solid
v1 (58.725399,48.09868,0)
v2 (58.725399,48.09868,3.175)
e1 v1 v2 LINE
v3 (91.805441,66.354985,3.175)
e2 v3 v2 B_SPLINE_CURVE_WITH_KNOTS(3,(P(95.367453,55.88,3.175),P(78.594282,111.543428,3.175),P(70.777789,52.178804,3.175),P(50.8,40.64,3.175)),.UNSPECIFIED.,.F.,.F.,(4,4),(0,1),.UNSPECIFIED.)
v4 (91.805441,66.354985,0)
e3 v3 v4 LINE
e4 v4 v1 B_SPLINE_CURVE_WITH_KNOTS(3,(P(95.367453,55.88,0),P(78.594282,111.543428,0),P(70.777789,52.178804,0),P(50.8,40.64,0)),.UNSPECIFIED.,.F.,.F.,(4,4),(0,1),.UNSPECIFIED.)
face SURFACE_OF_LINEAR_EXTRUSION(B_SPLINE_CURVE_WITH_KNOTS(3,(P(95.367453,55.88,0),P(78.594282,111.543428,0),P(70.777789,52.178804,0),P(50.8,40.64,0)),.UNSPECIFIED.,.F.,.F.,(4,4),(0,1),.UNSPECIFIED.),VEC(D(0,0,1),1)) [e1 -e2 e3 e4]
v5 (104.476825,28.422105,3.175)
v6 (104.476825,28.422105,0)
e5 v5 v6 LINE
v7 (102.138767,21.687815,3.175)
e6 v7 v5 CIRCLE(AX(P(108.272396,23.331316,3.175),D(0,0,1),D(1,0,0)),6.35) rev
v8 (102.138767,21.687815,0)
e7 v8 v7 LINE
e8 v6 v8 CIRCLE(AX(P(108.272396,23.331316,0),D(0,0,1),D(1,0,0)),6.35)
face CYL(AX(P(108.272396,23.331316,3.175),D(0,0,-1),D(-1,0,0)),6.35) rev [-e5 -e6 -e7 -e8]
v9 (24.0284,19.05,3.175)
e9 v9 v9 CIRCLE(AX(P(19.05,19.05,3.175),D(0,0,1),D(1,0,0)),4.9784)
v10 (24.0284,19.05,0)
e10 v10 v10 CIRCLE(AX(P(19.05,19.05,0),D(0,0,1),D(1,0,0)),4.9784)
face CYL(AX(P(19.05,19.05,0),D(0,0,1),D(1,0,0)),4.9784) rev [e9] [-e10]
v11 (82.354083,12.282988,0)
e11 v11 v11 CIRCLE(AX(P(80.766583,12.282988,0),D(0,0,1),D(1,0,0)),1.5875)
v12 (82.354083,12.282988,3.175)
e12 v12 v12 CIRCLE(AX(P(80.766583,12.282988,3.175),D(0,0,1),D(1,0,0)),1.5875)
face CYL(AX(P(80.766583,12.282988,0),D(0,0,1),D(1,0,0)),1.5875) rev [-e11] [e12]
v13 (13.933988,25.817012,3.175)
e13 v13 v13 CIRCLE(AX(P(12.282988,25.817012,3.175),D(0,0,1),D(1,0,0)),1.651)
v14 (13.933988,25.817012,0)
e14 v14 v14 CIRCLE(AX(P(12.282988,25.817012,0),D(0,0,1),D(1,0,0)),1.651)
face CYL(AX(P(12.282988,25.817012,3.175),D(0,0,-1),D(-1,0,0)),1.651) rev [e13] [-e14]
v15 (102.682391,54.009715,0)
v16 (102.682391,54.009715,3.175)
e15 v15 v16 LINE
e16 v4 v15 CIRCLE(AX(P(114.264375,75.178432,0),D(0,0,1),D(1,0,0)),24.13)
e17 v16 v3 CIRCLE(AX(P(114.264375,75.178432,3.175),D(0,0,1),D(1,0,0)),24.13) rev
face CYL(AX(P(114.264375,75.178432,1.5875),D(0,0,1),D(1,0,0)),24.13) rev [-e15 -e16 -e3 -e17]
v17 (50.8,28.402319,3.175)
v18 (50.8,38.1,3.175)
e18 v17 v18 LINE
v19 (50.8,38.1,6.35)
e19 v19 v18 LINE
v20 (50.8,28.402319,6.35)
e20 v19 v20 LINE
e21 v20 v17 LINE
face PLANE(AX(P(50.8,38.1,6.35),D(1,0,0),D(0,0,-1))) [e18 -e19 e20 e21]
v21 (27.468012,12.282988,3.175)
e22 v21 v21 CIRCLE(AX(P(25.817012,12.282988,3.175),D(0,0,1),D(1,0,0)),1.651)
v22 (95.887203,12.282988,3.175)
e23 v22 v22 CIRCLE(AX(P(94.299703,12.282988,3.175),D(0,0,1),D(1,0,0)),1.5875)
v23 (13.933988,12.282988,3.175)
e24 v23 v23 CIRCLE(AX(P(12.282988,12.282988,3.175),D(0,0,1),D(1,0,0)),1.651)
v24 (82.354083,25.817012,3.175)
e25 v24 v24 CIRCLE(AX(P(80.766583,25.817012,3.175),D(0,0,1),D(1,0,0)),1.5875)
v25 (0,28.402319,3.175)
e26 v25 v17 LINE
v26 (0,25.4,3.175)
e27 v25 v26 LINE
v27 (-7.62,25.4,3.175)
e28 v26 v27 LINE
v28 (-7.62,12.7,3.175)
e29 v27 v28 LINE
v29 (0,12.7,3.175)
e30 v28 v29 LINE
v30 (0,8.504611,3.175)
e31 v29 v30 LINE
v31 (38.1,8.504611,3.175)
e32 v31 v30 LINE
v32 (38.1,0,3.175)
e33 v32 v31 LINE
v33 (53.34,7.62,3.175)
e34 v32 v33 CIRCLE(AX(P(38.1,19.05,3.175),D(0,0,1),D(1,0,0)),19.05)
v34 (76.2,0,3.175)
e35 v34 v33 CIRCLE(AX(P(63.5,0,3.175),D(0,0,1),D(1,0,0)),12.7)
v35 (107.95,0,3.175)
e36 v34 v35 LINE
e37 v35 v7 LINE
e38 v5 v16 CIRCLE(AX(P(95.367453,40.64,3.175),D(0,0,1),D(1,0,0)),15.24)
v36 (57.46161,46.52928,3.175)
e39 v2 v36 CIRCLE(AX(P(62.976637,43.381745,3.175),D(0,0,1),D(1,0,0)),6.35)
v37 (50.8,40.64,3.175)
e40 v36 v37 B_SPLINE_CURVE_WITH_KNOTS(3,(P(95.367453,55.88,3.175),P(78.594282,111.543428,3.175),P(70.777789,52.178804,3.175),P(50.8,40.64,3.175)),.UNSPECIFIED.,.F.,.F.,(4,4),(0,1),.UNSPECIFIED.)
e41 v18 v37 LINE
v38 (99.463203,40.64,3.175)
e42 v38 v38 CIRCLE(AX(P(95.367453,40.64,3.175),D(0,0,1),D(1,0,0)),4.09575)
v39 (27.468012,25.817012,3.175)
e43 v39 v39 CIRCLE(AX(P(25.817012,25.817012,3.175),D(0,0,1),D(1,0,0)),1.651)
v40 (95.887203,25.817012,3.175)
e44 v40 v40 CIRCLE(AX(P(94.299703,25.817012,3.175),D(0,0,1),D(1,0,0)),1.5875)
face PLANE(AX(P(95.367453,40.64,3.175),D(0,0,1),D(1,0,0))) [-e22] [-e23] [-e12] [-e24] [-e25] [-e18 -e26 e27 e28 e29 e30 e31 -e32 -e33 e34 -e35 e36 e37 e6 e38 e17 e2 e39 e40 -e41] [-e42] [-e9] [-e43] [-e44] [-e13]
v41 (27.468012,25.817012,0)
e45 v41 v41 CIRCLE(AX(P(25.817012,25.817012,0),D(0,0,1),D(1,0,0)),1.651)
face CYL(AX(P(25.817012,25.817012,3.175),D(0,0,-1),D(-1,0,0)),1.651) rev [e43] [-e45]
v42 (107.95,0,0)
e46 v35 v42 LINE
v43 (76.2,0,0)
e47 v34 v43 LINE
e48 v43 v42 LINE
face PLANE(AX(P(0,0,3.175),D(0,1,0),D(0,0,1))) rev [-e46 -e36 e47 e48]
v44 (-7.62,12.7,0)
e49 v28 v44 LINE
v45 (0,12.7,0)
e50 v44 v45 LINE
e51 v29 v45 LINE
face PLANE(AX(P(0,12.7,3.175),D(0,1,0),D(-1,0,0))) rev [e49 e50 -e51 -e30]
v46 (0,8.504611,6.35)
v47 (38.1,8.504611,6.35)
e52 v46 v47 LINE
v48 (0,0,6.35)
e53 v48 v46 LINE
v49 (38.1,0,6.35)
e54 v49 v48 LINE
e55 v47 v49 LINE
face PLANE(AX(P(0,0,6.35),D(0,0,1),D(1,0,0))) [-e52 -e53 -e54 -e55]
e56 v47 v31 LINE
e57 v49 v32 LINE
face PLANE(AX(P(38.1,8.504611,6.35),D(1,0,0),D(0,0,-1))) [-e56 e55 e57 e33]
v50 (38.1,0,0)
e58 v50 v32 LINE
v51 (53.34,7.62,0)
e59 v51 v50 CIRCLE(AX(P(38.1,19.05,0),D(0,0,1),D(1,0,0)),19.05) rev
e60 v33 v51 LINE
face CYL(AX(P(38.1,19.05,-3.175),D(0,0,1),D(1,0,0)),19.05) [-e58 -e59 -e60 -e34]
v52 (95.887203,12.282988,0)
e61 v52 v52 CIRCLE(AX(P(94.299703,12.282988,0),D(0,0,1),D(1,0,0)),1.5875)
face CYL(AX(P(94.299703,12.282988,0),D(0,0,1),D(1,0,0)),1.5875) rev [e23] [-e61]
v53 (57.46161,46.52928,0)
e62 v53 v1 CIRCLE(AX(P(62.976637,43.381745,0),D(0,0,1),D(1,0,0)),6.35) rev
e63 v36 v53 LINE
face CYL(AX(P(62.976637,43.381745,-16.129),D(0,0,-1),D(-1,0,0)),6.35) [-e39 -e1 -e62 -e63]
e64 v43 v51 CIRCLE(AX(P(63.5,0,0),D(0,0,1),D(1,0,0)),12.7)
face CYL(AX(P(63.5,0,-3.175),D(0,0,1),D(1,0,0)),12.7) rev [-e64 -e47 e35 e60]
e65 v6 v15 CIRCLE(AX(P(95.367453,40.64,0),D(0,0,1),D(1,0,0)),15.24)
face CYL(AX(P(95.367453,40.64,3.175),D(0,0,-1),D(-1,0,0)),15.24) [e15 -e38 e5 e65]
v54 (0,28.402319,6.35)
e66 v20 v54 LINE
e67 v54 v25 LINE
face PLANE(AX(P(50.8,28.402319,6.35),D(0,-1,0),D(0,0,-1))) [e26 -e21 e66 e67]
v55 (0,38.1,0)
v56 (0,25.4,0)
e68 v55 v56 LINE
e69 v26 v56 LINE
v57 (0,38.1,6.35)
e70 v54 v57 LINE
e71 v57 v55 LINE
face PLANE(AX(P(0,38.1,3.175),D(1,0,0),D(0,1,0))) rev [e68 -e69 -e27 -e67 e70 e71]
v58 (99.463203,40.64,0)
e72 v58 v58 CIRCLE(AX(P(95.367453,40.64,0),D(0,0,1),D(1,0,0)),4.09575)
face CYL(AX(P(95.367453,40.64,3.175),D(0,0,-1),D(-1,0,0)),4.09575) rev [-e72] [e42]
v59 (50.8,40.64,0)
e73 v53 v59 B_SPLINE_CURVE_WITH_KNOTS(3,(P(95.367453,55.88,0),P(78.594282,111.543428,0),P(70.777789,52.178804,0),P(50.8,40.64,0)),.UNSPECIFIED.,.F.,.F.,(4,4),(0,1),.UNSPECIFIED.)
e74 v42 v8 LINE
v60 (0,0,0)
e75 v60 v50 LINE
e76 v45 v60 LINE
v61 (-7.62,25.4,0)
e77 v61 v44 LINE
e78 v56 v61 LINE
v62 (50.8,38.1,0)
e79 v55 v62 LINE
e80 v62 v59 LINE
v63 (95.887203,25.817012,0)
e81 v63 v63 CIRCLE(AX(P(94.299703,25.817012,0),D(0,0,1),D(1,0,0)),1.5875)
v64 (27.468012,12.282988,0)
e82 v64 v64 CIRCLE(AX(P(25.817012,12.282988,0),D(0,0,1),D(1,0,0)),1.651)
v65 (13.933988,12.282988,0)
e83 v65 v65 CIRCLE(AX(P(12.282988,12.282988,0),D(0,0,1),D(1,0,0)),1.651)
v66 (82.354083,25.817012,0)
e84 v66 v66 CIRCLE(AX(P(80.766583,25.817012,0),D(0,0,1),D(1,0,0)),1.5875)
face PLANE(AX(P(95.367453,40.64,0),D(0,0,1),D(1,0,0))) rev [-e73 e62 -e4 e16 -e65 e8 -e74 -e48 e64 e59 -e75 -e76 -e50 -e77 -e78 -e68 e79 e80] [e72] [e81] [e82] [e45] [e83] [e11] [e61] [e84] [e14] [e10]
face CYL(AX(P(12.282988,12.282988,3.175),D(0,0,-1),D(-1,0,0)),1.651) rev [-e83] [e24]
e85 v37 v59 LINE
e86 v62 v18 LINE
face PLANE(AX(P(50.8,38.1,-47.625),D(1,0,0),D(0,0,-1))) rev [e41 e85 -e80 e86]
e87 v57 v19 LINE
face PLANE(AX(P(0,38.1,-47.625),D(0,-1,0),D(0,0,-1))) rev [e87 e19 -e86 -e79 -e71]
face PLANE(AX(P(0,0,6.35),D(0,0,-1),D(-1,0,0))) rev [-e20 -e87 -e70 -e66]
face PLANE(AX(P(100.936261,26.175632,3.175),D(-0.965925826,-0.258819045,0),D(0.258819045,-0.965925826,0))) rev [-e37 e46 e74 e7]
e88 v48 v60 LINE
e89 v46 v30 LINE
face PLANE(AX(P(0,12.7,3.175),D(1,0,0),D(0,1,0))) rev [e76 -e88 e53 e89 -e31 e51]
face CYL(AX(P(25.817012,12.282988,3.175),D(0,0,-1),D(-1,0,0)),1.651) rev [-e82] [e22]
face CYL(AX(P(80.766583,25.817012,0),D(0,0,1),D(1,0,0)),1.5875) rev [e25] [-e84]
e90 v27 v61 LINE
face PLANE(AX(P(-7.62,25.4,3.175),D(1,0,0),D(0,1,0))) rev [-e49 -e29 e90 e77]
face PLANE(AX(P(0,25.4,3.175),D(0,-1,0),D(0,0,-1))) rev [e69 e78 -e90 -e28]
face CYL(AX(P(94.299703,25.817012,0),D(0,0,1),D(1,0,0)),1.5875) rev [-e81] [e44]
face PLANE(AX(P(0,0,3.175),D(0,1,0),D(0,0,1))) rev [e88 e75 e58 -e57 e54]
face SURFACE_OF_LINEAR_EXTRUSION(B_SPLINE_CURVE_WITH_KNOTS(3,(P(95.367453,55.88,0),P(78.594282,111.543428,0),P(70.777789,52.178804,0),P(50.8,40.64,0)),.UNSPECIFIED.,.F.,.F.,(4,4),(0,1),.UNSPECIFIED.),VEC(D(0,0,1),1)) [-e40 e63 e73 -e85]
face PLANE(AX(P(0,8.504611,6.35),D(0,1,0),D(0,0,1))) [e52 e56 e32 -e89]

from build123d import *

# Parameters (mm, degrees)
SKETCH1_R           = 4.09575
SKETCH1_R_2         = 1.651
BOSS_EXTRUDE1_DEPTH = 3.175
CUT_EXTRUDE2_DEPTH  = 6.35
SKETCH7_R           = 4.9784
SKETCH7_R_2         = 1.5875
CUT_EXTRUDE3_DEPTH  = 124.96234811
FILLET1_R           = 6.35
SKETCH8_W           = 50.8
SKETCH8_H           = 12.7
CUT_EXTRUDE4_DEPTH  = 50.8
CUT_EXTRUDE5_DEPTH  = 19.304
FILLET6_R           = 6.35
FILLET7_R           = 6.35
FILLET8_R           = 19.05
BOSS_EXTRUDE2_DEPTH = 3.175
FILLET9_R           = 24.13
SKETCH13_W          = 50.8
SKETCH13_H          = 9.69768102
SKETCH13_W_2        = 38.1
SKETCH13_H_2        = 8.504610511
BOSS_EXTRUDE3_DEPTH = 6.35


with BuildPart() as part:
    # Sketch1 → Boss-Extrude1 (new body)
    with BuildSketch(Plane.XY):
        with BuildLine():
            Line((0, 0), (107.95, 0))
            Line((107.95, 0), (100.9362606, 26.175631792))
            Line((100.9362606, 26.175631792), (100.868755024, 26.427566033))
            ThreePointArc((100.868755024, 26.427566033), (110.348359368, 43.438223217), (95.367453293, 55.88))
            Line((95.367453293, 55.88), (0, 38.1))
            Line((0, 38.1), (0, 25.4))
            Line((0, 25.4), (-7.62, 25.4))
            Line((-7.62, 25.4), (-7.62, 12.7))
            Line((-7.62, 12.7), (0, 12.7))
            Line((0, 12.7), (0, 0))
        make_face()
        with Locations((95.367453293, 40.64)):
            Circle(SKETCH1_R, mode=Mode.SUBTRACT)
        with Locations((25.817011896, 25.817011896)):
            Circle(SKETCH1_R_2, mode=Mode.SUBTRACT)
        with Locations((25.817011896, 12.282988104)):
            Circle(SKETCH1_R_2, mode=Mode.SUBTRACT)
        with Locations((12.282988104, 12.282988104)):
            Circle(SKETCH1_R_2, mode=Mode.SUBTRACT)
        with Locations((12.282988104, 25.817011896)):
            Circle(SKETCH1_R_2, mode=Mode.SUBTRACT)
    extrude(amount=BOSS_EXTRUDE1_DEPTH)

    # Sketch6 → Cut-Extrude2 (cut)
    with BuildSketch(Plane.XY.offset(3.175)):
        with BuildLine():
            Line((50.8, 0), (76.2, 0))
            ThreePointArc((76.2, 0), (63.5, 12.7), (50.8, 0))
        make_face()
    extrude(amount=-CUT_EXTRUDE2_DEPTH, mode=Mode.SUBTRACT)

    # Sketch7 → Cut-Extrude3 (cut, through all)
    with BuildSketch(Plane.XY.offset(3.175)):
        with Locations((19.05, 19.05)):
            Circle(SKETCH7_R)
        with Locations((80.766582748, 12.282988104)):
            Circle(SKETCH7_R_2)
        with Locations((94.299702748, 12.282988104)):
            Circle(SKETCH7_R_2)
        with Locations((80.766582748, 25.817011896)):
            Circle(SKETCH7_R_2)
        with Locations((94.299702748, 25.817011896)):
            Circle(SKETCH7_R_2)
    extrude(amount=-CUT_EXTRUDE3_DEPTH, mode=Mode.SUBTRACT)

    # Fillet1
    fillet1_edges = [part.edges().sort_by_distance(p)[0] for p in [
        (100.868755024, 26.427566033, 1.5875),
    ]]
    fillet(fillet1_edges, radius=FILLET1_R)

    # Sketch8 → Cut-Extrude4 (cut)
    with BuildSketch(Plane.XY.offset(3.175)):
        with Locations((25.4, 44.45)):
            Rectangle(SKETCH8_W, SKETCH8_H)
    extrude(amount=-CUT_EXTRUDE4_DEPTH, mode=Mode.SUBTRACT)

    # Sketch9 → Cut-Extrude5 (cut)
    with BuildSketch(Plane.XY.offset(3.175)):
        Polygon((50.8, 47.57098794), (50.8, 40.64), (57.15, 40.64), (57.15, 48.754861432), align=None)
    extrude(amount=-CUT_EXTRUDE5_DEPTH, mode=Mode.SUBTRACT)

    # Fillet6
    fillet6_edges = [part.edges().sort_by_distance(p)[0] for p in [
        (57.15, 40.64, 1.5875),
    ]]
    fillet(fillet6_edges, radius=FILLET6_R - 0.0001)  # a hair under: the kernel refuses the full size

    # Fillet7
    fillet7_edges = [part.edges().sort_by_distance(p)[0] for p in [
        (57.15, 48.754861432, 1.5875),
    ]]
    fillet(fillet7_edges, radius=FILLET7_R)

    # Fillet8
    fillet8_edges = [part.edges().sort_by_distance(p)[0] for p in [
        (50.8, 0, 1.5875),
    ]]
    fillet(fillet8_edges, radius=FILLET8_R)

    # Sketch12 → Boss-Extrude2 (add)
    with BuildSketch(Plane.XY.offset(3.175)):
        with BuildLine():
            Line((50.8, 40.64), (85.027112904, 40.64))
            Line((85.027112904, 40.64), (95.367453293, 55.88))
            add(Edge.make_bspline(
                [(50.8, 40.64), (70.777788932, 52.178803671), (78.594281742, 111.543427795), (95.367453293, 55.88)],
                knots=[0, 0, 0, 0, 1, 1, 1, 1], degree=3))
        make_face()
    extrude(amount=-BOSS_EXTRUDE2_DEPTH)

    # Fillet9
    fillet9_edges = [part.edges().sort_by_distance(p)[0] for p in [
        (95.367453293, 55.88, 1.5875),
    ]]
    fillet(fillet9_edges, radius=FILLET9_R)

    # Sketch13 → Boss-Extrude3 (add)
    with BuildSketch(Plane(origin=(0, 0, 0), x_dir=(-1, 0, 0), z_dir=(0, 0, -1))):
        with Locations((-25.4, 33.25115949)):
            Rectangle(SKETCH13_W, SKETCH13_H)
        with Locations((-19.05, 4.252305256)):
            Rectangle(SKETCH13_W_2, SKETCH13_H_2)
    extrude(amount=-BOSS_EXTRUDE3_DEPTH)


solid = part.part
